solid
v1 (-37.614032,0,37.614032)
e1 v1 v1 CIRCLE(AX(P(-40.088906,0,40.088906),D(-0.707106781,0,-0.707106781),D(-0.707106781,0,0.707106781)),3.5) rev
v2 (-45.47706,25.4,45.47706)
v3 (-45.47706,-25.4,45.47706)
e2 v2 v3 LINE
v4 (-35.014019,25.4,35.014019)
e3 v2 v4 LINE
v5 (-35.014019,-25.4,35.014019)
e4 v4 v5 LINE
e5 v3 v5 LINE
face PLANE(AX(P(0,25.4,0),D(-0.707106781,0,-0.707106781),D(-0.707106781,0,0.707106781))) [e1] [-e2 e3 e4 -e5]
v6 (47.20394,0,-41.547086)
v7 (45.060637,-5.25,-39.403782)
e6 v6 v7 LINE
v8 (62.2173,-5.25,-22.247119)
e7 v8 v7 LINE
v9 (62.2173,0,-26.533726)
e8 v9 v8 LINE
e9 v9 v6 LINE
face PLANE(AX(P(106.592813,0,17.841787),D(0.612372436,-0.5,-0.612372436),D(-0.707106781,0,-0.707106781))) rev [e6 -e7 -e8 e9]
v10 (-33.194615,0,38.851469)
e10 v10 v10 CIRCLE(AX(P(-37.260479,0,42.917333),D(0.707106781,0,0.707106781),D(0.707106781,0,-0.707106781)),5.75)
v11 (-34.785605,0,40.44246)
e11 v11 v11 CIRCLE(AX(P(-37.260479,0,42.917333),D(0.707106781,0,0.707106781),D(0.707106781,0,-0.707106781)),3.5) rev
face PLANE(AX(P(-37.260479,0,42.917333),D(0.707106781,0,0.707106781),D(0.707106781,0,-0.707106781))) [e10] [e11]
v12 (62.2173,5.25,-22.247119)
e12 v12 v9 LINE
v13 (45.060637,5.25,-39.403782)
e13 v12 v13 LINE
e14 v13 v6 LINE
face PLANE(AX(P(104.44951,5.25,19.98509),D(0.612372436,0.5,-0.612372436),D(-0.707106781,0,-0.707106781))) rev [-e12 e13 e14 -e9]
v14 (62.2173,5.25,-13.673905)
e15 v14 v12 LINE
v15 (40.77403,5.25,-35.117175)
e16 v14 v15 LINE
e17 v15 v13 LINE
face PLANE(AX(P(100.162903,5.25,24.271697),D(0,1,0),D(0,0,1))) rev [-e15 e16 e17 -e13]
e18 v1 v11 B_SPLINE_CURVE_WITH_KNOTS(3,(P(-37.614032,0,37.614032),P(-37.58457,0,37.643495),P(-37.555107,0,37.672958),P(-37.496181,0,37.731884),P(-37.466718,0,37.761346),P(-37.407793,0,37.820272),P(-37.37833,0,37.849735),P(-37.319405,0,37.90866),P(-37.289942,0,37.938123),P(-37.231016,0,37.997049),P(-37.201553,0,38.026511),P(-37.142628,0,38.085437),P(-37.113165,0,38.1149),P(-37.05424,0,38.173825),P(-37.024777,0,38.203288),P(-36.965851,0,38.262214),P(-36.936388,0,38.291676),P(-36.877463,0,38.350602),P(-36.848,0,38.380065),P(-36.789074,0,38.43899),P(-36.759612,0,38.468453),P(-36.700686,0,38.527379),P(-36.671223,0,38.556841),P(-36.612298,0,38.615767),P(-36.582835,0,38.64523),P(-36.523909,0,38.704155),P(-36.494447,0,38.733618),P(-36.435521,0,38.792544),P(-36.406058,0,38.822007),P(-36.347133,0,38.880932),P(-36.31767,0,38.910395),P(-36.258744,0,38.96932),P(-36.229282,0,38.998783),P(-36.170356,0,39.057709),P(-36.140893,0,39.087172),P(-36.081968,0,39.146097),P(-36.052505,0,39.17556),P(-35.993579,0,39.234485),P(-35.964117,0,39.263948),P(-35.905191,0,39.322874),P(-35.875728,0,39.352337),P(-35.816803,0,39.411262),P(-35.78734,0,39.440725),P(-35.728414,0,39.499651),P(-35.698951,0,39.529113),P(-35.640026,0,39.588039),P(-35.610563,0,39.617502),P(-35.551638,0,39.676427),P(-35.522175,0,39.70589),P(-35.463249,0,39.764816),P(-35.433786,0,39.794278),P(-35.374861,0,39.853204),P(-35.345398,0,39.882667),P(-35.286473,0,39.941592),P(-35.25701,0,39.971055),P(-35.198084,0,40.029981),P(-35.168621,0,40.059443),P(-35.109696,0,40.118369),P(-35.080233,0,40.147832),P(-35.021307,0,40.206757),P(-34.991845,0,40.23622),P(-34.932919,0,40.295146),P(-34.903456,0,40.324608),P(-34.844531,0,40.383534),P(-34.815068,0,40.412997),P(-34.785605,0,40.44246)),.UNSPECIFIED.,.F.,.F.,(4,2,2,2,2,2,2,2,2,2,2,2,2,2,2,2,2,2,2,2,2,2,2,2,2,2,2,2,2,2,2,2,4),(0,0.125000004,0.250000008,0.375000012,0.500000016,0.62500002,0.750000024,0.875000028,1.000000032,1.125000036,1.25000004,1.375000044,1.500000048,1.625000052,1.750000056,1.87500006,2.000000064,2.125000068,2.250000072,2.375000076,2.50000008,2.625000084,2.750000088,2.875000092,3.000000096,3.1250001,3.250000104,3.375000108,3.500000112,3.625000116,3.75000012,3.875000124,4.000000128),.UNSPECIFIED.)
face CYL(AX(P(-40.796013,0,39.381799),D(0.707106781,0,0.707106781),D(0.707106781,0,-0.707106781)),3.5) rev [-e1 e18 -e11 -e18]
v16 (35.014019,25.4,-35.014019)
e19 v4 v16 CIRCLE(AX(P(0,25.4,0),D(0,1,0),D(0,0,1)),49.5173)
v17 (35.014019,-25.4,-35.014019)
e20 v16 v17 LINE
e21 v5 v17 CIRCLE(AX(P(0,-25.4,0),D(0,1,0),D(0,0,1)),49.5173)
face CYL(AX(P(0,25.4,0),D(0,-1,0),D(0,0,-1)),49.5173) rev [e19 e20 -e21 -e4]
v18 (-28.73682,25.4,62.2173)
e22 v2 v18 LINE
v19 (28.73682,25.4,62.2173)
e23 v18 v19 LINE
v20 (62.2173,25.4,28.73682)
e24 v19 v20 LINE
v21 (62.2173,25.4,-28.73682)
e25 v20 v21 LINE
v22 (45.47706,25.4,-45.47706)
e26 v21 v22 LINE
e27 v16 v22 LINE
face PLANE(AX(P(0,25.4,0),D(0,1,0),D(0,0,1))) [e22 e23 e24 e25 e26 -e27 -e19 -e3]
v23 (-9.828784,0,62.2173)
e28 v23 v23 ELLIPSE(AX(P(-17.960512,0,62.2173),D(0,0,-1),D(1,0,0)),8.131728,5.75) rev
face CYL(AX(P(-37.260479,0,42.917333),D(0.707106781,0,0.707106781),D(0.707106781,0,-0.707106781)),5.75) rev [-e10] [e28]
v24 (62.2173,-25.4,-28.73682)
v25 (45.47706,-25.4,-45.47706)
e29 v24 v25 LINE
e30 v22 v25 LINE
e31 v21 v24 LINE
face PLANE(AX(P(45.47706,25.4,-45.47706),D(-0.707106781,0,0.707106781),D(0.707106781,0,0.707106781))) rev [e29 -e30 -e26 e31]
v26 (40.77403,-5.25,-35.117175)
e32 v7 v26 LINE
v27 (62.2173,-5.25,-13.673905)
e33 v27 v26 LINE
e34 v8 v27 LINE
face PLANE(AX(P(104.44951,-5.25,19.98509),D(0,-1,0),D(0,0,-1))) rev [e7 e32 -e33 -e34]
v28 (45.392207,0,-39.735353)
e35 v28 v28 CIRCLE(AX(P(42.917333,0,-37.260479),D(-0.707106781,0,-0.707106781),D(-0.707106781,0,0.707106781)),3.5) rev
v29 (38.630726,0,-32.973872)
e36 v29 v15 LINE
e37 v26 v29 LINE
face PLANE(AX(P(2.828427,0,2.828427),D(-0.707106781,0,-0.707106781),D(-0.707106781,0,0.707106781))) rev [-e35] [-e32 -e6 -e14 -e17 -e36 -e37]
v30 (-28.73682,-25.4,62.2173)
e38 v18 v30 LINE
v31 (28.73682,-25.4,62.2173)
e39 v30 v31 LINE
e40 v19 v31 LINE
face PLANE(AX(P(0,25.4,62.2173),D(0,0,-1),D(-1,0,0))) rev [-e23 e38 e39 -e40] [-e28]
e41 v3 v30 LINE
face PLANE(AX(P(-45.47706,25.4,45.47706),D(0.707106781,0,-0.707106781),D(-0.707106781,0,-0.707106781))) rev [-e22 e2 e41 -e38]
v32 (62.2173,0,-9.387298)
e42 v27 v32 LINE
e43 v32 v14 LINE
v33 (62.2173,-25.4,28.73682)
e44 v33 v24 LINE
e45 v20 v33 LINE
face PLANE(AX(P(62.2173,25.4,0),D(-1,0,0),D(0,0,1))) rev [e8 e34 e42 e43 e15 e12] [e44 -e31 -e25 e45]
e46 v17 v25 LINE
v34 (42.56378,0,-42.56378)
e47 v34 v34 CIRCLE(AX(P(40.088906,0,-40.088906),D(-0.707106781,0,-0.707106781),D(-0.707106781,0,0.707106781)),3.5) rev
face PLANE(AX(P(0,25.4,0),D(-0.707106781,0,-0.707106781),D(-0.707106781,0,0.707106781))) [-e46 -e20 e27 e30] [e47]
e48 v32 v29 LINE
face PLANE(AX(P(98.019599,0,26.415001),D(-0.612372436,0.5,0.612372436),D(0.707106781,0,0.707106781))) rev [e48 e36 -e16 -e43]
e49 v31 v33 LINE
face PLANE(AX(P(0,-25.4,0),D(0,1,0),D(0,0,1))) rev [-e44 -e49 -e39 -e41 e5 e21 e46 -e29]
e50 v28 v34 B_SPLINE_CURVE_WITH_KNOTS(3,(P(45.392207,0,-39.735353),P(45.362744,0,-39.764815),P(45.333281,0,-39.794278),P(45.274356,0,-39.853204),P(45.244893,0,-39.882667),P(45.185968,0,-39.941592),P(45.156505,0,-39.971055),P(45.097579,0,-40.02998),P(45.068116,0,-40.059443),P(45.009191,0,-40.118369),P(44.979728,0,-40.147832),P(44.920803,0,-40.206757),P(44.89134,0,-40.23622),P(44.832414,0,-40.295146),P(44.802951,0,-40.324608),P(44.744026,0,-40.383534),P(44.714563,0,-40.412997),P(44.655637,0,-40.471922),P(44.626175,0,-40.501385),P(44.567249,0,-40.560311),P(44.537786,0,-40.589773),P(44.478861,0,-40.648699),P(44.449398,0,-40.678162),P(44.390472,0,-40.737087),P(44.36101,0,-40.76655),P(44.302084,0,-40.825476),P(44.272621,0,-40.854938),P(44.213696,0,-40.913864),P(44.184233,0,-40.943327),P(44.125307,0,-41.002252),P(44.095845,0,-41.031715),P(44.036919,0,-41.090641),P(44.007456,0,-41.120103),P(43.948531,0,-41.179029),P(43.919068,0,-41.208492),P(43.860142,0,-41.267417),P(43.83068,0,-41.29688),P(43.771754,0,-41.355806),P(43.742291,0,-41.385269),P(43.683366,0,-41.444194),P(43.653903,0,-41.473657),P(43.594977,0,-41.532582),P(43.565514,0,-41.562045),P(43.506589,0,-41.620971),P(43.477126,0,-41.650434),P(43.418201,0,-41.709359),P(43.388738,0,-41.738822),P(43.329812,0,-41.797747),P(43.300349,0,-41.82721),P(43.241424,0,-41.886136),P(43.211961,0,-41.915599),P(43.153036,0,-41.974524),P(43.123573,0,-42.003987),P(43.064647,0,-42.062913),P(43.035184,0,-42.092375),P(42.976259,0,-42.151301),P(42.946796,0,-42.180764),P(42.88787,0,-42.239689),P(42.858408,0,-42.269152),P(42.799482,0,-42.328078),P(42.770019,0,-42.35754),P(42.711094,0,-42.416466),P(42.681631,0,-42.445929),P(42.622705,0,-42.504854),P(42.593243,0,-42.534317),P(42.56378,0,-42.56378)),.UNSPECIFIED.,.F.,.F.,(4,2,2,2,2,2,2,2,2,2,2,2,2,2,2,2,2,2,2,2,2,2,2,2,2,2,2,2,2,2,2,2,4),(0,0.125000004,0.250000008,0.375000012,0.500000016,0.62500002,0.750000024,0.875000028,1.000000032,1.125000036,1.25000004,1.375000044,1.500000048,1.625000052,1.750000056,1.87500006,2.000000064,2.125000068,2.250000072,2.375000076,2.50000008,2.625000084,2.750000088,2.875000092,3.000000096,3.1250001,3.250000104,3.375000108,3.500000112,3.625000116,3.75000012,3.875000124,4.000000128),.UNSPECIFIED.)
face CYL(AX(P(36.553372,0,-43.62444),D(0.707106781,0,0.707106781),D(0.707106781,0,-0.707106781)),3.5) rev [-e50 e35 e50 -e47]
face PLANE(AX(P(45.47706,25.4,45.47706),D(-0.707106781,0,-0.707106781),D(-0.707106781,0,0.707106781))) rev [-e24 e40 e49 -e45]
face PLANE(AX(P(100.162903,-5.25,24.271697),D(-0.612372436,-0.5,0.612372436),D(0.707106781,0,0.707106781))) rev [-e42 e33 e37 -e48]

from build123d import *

# Parameters (mm, degrees)
BOSS_EXTRUDE1_DEPTH  = 25.4
CUT_SWEEP1_START     = 4.000000128
CUT_SWEEP1_OUTLINE_R = 5.750000057
CUT_SWEEP1_DEPTH     = 33.044274766
CUT_SWEEP2_PROFILE_R = 3.499999985
CUT_EXTRUDE1_DEPTH   = 88.74529292


# Read off the part's stored shape, not the designer's step: Cut-Sweep1
with BuildPart() as part:
    # Sketch1 → Boss-Extrude1 (new, symmetric)
    with BuildSketch(Plane(origin=(0, 0, 0), x_dir=(1, 0, 0), z_dir=(0, 1, 0))):
        Polygon((-37.260478906, -42.917333336), (-40.088906121, -40.088906121), (-45.477059794, -45.477059794), (-28.736819587, -62.2173), (-17.960512242, -62.2173), align=None)
        with BuildLine():
            ThreePointArc((35.014018616, -35.014018616), (0, -49.5173), (-35.014018616, -35.014018616))
            Line((-35.014018616, -35.014018616), (-40.088906121, -40.088906121))
            Line((-40.088906121, -40.088906121), (-37.260478906, -42.917333336))
            Line((-37.260478906, -42.917333336), (-17.960512242, -62.2173))
            Line((-17.960512242, -62.2173), (0, -62.2173))
            Line((0, -62.2173), (28.736819587, -62.2173))
            Line((28.736819587, -62.2173), (45.477059794, -45.477059794))
            Line((45.477059794, -45.477059794), (35.014018616, -35.014018616))
        make_face()
        with BuildLine():
            Line((42.917333336, 37.260478906), (40.088906121, 40.088906121))
            Line((40.088906121, 40.088906121), (35.014018616, 35.014018616))
            ThreePointArc((35.014018616, 35.014018616), (45.748019975, 18.949450325), (49.5173, 0))
            ThreePointArc((49.5173, 0), (45.748019975, -18.949450325), (35.014018616, -35.014018616))
            Line((35.014018616, -35.014018616), (45.477059794, -45.477059794))
            Line((45.477059794, -45.477059794), (62.2173, -28.736819587))
            Line((62.2173, -28.736819587), (62.2173, 0))
            Line((62.2173, 0), (62.2173, 17.960512242))
            Line((62.2173, 17.960512242), (42.917333336, 37.260478906))
        make_face()
        Polygon((62.2173, 28.736819587), (45.477059794, 45.477059794), (40.088906121, 40.088906121), (42.917333336, 37.260478906), (62.2173, 17.960512242), align=None)
    extrude(amount=BOSS_EXTRUDE1_DEPTH, both=True)

    # Cut-Sweep1 outline → Cut-Sweep1 (cut)
    with BuildSketch(Plane(origin=(0, 0, 0), x_dir=(0.7071067811865471, 0, -0.707106781186548), z_dir=(0.707106781186548, 0, 0.707106781186547)).offset(CUT_SWEEP1_START)):
        with Locations((-56.694274737, 0)):
            Circle(CUT_SWEEP1_OUTLINE_R)
    extrude(amount=CUT_SWEEP1_DEPTH, mode=Mode.SUBTRACT)

    # Cut-Sweep2: sweep along a path in Sketch44
    with BuildLine(Plane(origin=(0, 0, 0), x_dir=(1, 0, 0), z_dir=(0, 1, 0))) as cut_sweep2_path:
        Line((-40.088906121, -40.088906121), (-37.260478906, -42.917333336))
    # Cut-Sweep2 profile (on start of the path) → Cut-Sweep2 (sweep, cut)
    with BuildSketch(Plane(origin=(-40.088906121, 0, 40.088906121), x_dir=(0.7071067811865493, 0, -0.7071067811865458), z_dir=(0.7071067811865458, 0, 0.7071067811865493))):
        Circle(CUT_SWEEP2_PROFILE_R)
    cut_sweep2 = sweep(path=cut_sweep2_path.line, mode=Mode.SUBTRACT)

    # Mirror1: Cut-Sweep2 across plane
    add(cut_sweep2.mirror(Plane(origin=(0, 0, 0), x_dir=(0.7071067811865477, 0, 0.7071067811865474), z_dir=(-0.7071067811865476, 0, 0.7071067811865476))), mode=Mode.SUBTRACT)

    # Sketch53 → Cut-Extrude1 (cut, through all)
    with BuildSketch(Plane(origin=(2.828427215, 0, 2.828427215), x_dir=(-0.7071067811865427, 0, 0.7071067811865525), z_dir=(-0.7071067811865525, 0, -0.7071067811865427))):
        Polygon((-62.756452611, 0), (-59.725363674, -5.250000041), (-53.6631858, -5.250000041), (-50.632096863, 0), (-53.6631858, 5.250000041), (-59.725363674, 5.250000041), align=None)
    extrude(amount=-CUT_EXTRUDE1_DEPTH, mode=Mode.SUBTRACT)


solid = part.part
